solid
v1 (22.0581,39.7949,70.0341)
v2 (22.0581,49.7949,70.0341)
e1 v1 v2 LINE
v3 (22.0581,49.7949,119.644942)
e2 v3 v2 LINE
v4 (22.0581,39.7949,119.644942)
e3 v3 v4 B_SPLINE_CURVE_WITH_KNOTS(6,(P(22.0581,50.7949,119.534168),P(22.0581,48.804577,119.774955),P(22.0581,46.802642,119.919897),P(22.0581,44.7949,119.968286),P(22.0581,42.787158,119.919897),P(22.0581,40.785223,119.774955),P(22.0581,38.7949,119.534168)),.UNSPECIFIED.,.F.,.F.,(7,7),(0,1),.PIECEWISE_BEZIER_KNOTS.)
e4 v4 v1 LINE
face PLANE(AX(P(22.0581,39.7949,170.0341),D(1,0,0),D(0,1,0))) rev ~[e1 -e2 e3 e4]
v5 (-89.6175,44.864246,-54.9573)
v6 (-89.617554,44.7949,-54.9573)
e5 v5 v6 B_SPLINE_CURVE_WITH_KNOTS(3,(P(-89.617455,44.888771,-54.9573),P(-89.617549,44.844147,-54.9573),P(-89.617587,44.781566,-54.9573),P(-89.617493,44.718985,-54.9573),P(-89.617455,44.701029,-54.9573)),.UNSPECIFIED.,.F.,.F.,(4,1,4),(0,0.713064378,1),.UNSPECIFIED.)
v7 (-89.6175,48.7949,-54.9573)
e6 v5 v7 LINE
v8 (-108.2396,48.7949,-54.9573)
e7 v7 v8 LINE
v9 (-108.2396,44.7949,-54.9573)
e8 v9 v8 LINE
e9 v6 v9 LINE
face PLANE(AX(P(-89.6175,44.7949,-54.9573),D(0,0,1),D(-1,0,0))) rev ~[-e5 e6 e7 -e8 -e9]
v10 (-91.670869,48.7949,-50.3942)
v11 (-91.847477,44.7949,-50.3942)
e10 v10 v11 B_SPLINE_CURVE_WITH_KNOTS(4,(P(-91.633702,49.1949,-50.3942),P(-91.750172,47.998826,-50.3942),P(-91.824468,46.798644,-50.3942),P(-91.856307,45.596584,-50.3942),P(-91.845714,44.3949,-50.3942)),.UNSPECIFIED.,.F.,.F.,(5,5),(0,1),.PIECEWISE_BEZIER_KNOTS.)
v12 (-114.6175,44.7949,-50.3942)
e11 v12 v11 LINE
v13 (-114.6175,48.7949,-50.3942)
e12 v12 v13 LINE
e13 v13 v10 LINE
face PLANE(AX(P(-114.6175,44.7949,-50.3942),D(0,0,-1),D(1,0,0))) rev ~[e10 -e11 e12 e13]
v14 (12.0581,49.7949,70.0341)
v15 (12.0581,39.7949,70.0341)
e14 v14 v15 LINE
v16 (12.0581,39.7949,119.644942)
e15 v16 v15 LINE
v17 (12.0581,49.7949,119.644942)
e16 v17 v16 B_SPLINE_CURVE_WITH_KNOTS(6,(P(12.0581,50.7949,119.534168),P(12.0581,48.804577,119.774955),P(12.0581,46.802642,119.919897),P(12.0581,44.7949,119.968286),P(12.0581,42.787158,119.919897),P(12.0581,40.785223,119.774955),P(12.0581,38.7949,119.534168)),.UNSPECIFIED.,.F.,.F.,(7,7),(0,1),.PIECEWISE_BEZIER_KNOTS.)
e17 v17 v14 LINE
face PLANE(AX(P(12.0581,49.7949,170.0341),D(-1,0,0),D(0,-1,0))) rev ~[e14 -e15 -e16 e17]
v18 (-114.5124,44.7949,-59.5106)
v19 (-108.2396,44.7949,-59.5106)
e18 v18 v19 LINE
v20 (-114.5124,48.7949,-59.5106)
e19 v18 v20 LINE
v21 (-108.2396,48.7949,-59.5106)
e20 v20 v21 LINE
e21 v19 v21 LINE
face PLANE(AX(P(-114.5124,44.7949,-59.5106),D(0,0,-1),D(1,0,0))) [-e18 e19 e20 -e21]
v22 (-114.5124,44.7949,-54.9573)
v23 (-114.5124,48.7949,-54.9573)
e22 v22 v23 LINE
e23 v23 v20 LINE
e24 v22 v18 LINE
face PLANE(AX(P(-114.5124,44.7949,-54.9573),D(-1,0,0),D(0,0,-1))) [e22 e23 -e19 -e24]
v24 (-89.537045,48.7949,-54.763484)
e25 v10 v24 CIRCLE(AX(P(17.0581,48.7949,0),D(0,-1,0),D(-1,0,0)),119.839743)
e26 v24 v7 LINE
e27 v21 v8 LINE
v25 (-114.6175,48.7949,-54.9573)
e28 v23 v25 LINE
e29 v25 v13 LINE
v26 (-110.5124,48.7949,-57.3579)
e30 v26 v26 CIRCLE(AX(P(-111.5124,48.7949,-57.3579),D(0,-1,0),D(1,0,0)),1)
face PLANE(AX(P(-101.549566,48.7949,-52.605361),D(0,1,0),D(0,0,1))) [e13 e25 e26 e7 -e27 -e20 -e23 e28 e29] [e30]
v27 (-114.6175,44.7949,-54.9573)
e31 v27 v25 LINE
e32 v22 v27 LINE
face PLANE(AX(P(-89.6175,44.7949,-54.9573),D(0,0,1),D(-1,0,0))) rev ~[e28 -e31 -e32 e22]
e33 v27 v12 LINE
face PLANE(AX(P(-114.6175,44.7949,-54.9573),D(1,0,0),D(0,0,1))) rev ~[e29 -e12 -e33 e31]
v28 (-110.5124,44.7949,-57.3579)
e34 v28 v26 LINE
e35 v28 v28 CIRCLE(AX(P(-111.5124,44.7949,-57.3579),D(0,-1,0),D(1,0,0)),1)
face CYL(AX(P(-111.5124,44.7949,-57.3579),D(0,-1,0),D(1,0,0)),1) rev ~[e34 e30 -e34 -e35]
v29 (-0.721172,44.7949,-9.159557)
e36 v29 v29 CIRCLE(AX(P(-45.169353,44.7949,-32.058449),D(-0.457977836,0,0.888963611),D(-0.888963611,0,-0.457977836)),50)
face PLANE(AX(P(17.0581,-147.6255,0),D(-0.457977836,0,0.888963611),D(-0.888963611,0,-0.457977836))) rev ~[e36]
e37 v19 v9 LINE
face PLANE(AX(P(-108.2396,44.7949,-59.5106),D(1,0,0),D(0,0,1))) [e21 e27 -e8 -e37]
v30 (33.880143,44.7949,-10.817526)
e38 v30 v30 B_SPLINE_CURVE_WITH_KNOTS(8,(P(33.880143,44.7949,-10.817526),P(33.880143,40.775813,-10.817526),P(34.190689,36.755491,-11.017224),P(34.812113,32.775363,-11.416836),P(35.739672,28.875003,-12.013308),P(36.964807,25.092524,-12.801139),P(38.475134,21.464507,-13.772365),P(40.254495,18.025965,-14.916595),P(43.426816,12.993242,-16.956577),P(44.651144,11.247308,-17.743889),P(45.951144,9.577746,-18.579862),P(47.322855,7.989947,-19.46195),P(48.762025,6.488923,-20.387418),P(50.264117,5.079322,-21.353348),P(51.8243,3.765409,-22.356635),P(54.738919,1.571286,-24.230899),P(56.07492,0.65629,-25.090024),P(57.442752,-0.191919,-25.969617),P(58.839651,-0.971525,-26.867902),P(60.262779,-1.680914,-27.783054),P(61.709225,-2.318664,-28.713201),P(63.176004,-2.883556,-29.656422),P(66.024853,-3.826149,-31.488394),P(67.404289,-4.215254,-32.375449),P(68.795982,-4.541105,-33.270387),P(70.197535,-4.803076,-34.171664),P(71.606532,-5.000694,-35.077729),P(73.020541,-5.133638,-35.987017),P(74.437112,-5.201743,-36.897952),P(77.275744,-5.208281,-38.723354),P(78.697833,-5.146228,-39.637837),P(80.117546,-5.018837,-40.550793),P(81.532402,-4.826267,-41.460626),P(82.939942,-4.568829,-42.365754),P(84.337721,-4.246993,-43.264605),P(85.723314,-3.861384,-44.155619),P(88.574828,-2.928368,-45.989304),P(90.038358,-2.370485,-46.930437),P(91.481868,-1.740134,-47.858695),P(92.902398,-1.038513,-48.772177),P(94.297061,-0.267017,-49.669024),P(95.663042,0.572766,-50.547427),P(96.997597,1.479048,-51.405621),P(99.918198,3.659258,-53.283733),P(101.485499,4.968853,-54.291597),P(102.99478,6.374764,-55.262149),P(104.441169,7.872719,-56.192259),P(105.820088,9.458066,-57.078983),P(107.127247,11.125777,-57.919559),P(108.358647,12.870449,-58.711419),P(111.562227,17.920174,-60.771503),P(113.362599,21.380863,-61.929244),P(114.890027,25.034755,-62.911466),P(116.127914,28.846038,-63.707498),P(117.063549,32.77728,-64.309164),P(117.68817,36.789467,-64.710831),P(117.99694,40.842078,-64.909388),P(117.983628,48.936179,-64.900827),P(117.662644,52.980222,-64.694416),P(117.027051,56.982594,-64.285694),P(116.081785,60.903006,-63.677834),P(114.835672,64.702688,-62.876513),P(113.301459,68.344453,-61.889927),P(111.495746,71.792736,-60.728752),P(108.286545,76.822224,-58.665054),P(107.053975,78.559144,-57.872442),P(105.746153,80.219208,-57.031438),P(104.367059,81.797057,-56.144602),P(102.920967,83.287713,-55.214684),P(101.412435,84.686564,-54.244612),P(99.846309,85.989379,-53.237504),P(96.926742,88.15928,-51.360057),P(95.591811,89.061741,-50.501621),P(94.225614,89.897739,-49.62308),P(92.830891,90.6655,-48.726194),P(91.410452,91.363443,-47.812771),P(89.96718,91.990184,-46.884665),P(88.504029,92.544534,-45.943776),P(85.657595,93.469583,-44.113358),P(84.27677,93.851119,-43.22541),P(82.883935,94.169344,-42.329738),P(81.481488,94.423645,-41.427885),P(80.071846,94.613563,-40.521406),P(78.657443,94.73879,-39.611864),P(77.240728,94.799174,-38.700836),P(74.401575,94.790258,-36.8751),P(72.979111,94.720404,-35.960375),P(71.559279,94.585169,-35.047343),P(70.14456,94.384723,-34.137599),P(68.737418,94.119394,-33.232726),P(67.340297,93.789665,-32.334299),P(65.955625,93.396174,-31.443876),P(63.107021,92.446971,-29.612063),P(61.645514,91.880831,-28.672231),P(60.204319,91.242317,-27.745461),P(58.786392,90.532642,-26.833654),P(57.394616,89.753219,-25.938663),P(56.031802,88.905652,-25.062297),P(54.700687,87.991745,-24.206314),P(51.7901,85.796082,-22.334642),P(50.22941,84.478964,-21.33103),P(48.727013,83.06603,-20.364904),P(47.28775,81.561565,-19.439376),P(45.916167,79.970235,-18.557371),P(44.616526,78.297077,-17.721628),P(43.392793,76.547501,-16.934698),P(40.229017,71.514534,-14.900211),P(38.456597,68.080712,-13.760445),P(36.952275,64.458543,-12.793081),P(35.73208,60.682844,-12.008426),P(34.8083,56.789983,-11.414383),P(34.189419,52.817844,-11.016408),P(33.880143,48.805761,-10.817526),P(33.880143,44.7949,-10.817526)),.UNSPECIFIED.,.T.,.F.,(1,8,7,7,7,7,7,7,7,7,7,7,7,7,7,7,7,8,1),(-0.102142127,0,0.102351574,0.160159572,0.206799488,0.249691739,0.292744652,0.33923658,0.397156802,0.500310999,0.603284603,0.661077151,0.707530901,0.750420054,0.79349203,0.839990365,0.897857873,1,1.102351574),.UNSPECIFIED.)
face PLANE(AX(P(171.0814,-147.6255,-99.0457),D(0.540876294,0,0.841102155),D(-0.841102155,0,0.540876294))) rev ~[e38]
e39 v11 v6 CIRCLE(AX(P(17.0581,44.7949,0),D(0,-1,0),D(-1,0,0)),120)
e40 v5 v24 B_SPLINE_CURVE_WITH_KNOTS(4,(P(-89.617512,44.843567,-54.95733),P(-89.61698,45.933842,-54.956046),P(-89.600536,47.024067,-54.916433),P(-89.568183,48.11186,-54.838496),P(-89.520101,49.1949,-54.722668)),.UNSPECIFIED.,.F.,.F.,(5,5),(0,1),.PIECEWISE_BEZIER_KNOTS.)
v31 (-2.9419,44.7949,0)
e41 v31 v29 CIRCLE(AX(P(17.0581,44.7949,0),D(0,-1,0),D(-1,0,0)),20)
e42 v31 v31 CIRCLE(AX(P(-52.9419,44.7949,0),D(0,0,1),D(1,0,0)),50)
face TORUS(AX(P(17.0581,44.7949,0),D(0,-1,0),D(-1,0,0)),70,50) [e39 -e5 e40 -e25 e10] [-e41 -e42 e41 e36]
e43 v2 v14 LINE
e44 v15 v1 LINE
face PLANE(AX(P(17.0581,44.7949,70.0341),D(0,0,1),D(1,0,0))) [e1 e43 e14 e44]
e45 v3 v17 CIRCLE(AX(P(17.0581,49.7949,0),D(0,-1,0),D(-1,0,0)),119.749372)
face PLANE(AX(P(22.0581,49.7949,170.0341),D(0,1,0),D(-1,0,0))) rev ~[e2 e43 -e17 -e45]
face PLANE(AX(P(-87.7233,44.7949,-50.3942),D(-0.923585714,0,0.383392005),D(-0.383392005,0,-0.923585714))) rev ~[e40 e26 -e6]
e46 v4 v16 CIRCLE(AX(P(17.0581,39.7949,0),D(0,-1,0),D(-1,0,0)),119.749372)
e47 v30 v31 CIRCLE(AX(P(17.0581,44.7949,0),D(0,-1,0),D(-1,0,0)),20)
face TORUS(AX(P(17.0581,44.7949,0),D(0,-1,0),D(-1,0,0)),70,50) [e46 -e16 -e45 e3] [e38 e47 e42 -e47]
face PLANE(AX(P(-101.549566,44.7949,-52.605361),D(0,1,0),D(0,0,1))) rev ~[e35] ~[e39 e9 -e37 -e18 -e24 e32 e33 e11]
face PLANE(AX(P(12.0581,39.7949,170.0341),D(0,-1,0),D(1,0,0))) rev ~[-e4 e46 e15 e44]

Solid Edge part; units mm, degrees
sketch "Sketch1" plane through (0, 0, 0) normal (0, 0, 1) x (1, 0, 0)
  circle A0 centre (-52.9419, 44.7949) radius 50
  dimension "D1" = 100
  dimension "D2" = 70
revolve "RevolvedProtrusion1" add sketch "Sketch1" angle 360 about axis through (17.0581, 73.3637, 0) along (0, -1, 0)
sketch "Sketch2" plane through (0, -147.6255, 0) normal (0, -1, 0) x (1, 0, 0)
  line L0 (17.0581, 0) -> (-138.6485, -80.2172)
  line L1 (-138.6485, -80.2172) -> (0, -167.5212)
  line L2 (0, -167.5212) -> (171.0814, -99.0457)
  line L3 (171.0814, -99.0457) -> (17.0581, 0)
extrude "Cutout1" cut sketch "Sketch2" against normal through all
sketch "Sketch3" plane through (0, 0, 170.0341) normal (0, 0, 1) x (1, 0, 0)
  line L0 (12.0581, 39.7949) -> (22.0581, 39.7949)
  line L1 (22.0581, 39.7949) -> (22.0581, 49.7949)
  line L2 (22.0581, 49.7949) -> (12.0581, 49.7949)
  line L3 (12.0581, 49.7949) -> (12.0581, 39.7949)
  dimension "D1" = 10
  dimension "D2" = 10
  dimension "D3" = 45
extrude "ExtrudedCutout_5" cut sketch "Sketch3" against normal blind 100
sketch "Sketch4" plane through (0, 44.7949, 0) normal (0, -1, 0) x (1, 0, 0)
  line L0 (-114.5124, -54.9573) -> (-114.5124, -59.5106)
  line L1 (-114.5124, -59.5106) -> (-108.2396, -59.5106)
  line L2 (-108.2396, -59.5106) -> (-108.2396, -54.9573)
  line L3 (-108.2396, -54.9573) -> (-114.5124, -54.9573)
  circle A0 centre (-111.5124, -57.3579) radius 1
  line L4 (-89.6175, -54.9573) -> (-114.6175, -54.9573)
  line L5 (-114.6175, -54.9573) -> (-114.6175, -50.3942)
  line L6 (-114.6175, -50.3942) -> (-87.7233, -50.3942)
  line L7 (-87.7233, -50.3942) -> (-89.6175, -54.9573)
  dimension "D1" = 25
  dimension "D2" = 3
extrude "ExtrudedProtrusion_1" add sketch "Sketch4" against normal blind 4
